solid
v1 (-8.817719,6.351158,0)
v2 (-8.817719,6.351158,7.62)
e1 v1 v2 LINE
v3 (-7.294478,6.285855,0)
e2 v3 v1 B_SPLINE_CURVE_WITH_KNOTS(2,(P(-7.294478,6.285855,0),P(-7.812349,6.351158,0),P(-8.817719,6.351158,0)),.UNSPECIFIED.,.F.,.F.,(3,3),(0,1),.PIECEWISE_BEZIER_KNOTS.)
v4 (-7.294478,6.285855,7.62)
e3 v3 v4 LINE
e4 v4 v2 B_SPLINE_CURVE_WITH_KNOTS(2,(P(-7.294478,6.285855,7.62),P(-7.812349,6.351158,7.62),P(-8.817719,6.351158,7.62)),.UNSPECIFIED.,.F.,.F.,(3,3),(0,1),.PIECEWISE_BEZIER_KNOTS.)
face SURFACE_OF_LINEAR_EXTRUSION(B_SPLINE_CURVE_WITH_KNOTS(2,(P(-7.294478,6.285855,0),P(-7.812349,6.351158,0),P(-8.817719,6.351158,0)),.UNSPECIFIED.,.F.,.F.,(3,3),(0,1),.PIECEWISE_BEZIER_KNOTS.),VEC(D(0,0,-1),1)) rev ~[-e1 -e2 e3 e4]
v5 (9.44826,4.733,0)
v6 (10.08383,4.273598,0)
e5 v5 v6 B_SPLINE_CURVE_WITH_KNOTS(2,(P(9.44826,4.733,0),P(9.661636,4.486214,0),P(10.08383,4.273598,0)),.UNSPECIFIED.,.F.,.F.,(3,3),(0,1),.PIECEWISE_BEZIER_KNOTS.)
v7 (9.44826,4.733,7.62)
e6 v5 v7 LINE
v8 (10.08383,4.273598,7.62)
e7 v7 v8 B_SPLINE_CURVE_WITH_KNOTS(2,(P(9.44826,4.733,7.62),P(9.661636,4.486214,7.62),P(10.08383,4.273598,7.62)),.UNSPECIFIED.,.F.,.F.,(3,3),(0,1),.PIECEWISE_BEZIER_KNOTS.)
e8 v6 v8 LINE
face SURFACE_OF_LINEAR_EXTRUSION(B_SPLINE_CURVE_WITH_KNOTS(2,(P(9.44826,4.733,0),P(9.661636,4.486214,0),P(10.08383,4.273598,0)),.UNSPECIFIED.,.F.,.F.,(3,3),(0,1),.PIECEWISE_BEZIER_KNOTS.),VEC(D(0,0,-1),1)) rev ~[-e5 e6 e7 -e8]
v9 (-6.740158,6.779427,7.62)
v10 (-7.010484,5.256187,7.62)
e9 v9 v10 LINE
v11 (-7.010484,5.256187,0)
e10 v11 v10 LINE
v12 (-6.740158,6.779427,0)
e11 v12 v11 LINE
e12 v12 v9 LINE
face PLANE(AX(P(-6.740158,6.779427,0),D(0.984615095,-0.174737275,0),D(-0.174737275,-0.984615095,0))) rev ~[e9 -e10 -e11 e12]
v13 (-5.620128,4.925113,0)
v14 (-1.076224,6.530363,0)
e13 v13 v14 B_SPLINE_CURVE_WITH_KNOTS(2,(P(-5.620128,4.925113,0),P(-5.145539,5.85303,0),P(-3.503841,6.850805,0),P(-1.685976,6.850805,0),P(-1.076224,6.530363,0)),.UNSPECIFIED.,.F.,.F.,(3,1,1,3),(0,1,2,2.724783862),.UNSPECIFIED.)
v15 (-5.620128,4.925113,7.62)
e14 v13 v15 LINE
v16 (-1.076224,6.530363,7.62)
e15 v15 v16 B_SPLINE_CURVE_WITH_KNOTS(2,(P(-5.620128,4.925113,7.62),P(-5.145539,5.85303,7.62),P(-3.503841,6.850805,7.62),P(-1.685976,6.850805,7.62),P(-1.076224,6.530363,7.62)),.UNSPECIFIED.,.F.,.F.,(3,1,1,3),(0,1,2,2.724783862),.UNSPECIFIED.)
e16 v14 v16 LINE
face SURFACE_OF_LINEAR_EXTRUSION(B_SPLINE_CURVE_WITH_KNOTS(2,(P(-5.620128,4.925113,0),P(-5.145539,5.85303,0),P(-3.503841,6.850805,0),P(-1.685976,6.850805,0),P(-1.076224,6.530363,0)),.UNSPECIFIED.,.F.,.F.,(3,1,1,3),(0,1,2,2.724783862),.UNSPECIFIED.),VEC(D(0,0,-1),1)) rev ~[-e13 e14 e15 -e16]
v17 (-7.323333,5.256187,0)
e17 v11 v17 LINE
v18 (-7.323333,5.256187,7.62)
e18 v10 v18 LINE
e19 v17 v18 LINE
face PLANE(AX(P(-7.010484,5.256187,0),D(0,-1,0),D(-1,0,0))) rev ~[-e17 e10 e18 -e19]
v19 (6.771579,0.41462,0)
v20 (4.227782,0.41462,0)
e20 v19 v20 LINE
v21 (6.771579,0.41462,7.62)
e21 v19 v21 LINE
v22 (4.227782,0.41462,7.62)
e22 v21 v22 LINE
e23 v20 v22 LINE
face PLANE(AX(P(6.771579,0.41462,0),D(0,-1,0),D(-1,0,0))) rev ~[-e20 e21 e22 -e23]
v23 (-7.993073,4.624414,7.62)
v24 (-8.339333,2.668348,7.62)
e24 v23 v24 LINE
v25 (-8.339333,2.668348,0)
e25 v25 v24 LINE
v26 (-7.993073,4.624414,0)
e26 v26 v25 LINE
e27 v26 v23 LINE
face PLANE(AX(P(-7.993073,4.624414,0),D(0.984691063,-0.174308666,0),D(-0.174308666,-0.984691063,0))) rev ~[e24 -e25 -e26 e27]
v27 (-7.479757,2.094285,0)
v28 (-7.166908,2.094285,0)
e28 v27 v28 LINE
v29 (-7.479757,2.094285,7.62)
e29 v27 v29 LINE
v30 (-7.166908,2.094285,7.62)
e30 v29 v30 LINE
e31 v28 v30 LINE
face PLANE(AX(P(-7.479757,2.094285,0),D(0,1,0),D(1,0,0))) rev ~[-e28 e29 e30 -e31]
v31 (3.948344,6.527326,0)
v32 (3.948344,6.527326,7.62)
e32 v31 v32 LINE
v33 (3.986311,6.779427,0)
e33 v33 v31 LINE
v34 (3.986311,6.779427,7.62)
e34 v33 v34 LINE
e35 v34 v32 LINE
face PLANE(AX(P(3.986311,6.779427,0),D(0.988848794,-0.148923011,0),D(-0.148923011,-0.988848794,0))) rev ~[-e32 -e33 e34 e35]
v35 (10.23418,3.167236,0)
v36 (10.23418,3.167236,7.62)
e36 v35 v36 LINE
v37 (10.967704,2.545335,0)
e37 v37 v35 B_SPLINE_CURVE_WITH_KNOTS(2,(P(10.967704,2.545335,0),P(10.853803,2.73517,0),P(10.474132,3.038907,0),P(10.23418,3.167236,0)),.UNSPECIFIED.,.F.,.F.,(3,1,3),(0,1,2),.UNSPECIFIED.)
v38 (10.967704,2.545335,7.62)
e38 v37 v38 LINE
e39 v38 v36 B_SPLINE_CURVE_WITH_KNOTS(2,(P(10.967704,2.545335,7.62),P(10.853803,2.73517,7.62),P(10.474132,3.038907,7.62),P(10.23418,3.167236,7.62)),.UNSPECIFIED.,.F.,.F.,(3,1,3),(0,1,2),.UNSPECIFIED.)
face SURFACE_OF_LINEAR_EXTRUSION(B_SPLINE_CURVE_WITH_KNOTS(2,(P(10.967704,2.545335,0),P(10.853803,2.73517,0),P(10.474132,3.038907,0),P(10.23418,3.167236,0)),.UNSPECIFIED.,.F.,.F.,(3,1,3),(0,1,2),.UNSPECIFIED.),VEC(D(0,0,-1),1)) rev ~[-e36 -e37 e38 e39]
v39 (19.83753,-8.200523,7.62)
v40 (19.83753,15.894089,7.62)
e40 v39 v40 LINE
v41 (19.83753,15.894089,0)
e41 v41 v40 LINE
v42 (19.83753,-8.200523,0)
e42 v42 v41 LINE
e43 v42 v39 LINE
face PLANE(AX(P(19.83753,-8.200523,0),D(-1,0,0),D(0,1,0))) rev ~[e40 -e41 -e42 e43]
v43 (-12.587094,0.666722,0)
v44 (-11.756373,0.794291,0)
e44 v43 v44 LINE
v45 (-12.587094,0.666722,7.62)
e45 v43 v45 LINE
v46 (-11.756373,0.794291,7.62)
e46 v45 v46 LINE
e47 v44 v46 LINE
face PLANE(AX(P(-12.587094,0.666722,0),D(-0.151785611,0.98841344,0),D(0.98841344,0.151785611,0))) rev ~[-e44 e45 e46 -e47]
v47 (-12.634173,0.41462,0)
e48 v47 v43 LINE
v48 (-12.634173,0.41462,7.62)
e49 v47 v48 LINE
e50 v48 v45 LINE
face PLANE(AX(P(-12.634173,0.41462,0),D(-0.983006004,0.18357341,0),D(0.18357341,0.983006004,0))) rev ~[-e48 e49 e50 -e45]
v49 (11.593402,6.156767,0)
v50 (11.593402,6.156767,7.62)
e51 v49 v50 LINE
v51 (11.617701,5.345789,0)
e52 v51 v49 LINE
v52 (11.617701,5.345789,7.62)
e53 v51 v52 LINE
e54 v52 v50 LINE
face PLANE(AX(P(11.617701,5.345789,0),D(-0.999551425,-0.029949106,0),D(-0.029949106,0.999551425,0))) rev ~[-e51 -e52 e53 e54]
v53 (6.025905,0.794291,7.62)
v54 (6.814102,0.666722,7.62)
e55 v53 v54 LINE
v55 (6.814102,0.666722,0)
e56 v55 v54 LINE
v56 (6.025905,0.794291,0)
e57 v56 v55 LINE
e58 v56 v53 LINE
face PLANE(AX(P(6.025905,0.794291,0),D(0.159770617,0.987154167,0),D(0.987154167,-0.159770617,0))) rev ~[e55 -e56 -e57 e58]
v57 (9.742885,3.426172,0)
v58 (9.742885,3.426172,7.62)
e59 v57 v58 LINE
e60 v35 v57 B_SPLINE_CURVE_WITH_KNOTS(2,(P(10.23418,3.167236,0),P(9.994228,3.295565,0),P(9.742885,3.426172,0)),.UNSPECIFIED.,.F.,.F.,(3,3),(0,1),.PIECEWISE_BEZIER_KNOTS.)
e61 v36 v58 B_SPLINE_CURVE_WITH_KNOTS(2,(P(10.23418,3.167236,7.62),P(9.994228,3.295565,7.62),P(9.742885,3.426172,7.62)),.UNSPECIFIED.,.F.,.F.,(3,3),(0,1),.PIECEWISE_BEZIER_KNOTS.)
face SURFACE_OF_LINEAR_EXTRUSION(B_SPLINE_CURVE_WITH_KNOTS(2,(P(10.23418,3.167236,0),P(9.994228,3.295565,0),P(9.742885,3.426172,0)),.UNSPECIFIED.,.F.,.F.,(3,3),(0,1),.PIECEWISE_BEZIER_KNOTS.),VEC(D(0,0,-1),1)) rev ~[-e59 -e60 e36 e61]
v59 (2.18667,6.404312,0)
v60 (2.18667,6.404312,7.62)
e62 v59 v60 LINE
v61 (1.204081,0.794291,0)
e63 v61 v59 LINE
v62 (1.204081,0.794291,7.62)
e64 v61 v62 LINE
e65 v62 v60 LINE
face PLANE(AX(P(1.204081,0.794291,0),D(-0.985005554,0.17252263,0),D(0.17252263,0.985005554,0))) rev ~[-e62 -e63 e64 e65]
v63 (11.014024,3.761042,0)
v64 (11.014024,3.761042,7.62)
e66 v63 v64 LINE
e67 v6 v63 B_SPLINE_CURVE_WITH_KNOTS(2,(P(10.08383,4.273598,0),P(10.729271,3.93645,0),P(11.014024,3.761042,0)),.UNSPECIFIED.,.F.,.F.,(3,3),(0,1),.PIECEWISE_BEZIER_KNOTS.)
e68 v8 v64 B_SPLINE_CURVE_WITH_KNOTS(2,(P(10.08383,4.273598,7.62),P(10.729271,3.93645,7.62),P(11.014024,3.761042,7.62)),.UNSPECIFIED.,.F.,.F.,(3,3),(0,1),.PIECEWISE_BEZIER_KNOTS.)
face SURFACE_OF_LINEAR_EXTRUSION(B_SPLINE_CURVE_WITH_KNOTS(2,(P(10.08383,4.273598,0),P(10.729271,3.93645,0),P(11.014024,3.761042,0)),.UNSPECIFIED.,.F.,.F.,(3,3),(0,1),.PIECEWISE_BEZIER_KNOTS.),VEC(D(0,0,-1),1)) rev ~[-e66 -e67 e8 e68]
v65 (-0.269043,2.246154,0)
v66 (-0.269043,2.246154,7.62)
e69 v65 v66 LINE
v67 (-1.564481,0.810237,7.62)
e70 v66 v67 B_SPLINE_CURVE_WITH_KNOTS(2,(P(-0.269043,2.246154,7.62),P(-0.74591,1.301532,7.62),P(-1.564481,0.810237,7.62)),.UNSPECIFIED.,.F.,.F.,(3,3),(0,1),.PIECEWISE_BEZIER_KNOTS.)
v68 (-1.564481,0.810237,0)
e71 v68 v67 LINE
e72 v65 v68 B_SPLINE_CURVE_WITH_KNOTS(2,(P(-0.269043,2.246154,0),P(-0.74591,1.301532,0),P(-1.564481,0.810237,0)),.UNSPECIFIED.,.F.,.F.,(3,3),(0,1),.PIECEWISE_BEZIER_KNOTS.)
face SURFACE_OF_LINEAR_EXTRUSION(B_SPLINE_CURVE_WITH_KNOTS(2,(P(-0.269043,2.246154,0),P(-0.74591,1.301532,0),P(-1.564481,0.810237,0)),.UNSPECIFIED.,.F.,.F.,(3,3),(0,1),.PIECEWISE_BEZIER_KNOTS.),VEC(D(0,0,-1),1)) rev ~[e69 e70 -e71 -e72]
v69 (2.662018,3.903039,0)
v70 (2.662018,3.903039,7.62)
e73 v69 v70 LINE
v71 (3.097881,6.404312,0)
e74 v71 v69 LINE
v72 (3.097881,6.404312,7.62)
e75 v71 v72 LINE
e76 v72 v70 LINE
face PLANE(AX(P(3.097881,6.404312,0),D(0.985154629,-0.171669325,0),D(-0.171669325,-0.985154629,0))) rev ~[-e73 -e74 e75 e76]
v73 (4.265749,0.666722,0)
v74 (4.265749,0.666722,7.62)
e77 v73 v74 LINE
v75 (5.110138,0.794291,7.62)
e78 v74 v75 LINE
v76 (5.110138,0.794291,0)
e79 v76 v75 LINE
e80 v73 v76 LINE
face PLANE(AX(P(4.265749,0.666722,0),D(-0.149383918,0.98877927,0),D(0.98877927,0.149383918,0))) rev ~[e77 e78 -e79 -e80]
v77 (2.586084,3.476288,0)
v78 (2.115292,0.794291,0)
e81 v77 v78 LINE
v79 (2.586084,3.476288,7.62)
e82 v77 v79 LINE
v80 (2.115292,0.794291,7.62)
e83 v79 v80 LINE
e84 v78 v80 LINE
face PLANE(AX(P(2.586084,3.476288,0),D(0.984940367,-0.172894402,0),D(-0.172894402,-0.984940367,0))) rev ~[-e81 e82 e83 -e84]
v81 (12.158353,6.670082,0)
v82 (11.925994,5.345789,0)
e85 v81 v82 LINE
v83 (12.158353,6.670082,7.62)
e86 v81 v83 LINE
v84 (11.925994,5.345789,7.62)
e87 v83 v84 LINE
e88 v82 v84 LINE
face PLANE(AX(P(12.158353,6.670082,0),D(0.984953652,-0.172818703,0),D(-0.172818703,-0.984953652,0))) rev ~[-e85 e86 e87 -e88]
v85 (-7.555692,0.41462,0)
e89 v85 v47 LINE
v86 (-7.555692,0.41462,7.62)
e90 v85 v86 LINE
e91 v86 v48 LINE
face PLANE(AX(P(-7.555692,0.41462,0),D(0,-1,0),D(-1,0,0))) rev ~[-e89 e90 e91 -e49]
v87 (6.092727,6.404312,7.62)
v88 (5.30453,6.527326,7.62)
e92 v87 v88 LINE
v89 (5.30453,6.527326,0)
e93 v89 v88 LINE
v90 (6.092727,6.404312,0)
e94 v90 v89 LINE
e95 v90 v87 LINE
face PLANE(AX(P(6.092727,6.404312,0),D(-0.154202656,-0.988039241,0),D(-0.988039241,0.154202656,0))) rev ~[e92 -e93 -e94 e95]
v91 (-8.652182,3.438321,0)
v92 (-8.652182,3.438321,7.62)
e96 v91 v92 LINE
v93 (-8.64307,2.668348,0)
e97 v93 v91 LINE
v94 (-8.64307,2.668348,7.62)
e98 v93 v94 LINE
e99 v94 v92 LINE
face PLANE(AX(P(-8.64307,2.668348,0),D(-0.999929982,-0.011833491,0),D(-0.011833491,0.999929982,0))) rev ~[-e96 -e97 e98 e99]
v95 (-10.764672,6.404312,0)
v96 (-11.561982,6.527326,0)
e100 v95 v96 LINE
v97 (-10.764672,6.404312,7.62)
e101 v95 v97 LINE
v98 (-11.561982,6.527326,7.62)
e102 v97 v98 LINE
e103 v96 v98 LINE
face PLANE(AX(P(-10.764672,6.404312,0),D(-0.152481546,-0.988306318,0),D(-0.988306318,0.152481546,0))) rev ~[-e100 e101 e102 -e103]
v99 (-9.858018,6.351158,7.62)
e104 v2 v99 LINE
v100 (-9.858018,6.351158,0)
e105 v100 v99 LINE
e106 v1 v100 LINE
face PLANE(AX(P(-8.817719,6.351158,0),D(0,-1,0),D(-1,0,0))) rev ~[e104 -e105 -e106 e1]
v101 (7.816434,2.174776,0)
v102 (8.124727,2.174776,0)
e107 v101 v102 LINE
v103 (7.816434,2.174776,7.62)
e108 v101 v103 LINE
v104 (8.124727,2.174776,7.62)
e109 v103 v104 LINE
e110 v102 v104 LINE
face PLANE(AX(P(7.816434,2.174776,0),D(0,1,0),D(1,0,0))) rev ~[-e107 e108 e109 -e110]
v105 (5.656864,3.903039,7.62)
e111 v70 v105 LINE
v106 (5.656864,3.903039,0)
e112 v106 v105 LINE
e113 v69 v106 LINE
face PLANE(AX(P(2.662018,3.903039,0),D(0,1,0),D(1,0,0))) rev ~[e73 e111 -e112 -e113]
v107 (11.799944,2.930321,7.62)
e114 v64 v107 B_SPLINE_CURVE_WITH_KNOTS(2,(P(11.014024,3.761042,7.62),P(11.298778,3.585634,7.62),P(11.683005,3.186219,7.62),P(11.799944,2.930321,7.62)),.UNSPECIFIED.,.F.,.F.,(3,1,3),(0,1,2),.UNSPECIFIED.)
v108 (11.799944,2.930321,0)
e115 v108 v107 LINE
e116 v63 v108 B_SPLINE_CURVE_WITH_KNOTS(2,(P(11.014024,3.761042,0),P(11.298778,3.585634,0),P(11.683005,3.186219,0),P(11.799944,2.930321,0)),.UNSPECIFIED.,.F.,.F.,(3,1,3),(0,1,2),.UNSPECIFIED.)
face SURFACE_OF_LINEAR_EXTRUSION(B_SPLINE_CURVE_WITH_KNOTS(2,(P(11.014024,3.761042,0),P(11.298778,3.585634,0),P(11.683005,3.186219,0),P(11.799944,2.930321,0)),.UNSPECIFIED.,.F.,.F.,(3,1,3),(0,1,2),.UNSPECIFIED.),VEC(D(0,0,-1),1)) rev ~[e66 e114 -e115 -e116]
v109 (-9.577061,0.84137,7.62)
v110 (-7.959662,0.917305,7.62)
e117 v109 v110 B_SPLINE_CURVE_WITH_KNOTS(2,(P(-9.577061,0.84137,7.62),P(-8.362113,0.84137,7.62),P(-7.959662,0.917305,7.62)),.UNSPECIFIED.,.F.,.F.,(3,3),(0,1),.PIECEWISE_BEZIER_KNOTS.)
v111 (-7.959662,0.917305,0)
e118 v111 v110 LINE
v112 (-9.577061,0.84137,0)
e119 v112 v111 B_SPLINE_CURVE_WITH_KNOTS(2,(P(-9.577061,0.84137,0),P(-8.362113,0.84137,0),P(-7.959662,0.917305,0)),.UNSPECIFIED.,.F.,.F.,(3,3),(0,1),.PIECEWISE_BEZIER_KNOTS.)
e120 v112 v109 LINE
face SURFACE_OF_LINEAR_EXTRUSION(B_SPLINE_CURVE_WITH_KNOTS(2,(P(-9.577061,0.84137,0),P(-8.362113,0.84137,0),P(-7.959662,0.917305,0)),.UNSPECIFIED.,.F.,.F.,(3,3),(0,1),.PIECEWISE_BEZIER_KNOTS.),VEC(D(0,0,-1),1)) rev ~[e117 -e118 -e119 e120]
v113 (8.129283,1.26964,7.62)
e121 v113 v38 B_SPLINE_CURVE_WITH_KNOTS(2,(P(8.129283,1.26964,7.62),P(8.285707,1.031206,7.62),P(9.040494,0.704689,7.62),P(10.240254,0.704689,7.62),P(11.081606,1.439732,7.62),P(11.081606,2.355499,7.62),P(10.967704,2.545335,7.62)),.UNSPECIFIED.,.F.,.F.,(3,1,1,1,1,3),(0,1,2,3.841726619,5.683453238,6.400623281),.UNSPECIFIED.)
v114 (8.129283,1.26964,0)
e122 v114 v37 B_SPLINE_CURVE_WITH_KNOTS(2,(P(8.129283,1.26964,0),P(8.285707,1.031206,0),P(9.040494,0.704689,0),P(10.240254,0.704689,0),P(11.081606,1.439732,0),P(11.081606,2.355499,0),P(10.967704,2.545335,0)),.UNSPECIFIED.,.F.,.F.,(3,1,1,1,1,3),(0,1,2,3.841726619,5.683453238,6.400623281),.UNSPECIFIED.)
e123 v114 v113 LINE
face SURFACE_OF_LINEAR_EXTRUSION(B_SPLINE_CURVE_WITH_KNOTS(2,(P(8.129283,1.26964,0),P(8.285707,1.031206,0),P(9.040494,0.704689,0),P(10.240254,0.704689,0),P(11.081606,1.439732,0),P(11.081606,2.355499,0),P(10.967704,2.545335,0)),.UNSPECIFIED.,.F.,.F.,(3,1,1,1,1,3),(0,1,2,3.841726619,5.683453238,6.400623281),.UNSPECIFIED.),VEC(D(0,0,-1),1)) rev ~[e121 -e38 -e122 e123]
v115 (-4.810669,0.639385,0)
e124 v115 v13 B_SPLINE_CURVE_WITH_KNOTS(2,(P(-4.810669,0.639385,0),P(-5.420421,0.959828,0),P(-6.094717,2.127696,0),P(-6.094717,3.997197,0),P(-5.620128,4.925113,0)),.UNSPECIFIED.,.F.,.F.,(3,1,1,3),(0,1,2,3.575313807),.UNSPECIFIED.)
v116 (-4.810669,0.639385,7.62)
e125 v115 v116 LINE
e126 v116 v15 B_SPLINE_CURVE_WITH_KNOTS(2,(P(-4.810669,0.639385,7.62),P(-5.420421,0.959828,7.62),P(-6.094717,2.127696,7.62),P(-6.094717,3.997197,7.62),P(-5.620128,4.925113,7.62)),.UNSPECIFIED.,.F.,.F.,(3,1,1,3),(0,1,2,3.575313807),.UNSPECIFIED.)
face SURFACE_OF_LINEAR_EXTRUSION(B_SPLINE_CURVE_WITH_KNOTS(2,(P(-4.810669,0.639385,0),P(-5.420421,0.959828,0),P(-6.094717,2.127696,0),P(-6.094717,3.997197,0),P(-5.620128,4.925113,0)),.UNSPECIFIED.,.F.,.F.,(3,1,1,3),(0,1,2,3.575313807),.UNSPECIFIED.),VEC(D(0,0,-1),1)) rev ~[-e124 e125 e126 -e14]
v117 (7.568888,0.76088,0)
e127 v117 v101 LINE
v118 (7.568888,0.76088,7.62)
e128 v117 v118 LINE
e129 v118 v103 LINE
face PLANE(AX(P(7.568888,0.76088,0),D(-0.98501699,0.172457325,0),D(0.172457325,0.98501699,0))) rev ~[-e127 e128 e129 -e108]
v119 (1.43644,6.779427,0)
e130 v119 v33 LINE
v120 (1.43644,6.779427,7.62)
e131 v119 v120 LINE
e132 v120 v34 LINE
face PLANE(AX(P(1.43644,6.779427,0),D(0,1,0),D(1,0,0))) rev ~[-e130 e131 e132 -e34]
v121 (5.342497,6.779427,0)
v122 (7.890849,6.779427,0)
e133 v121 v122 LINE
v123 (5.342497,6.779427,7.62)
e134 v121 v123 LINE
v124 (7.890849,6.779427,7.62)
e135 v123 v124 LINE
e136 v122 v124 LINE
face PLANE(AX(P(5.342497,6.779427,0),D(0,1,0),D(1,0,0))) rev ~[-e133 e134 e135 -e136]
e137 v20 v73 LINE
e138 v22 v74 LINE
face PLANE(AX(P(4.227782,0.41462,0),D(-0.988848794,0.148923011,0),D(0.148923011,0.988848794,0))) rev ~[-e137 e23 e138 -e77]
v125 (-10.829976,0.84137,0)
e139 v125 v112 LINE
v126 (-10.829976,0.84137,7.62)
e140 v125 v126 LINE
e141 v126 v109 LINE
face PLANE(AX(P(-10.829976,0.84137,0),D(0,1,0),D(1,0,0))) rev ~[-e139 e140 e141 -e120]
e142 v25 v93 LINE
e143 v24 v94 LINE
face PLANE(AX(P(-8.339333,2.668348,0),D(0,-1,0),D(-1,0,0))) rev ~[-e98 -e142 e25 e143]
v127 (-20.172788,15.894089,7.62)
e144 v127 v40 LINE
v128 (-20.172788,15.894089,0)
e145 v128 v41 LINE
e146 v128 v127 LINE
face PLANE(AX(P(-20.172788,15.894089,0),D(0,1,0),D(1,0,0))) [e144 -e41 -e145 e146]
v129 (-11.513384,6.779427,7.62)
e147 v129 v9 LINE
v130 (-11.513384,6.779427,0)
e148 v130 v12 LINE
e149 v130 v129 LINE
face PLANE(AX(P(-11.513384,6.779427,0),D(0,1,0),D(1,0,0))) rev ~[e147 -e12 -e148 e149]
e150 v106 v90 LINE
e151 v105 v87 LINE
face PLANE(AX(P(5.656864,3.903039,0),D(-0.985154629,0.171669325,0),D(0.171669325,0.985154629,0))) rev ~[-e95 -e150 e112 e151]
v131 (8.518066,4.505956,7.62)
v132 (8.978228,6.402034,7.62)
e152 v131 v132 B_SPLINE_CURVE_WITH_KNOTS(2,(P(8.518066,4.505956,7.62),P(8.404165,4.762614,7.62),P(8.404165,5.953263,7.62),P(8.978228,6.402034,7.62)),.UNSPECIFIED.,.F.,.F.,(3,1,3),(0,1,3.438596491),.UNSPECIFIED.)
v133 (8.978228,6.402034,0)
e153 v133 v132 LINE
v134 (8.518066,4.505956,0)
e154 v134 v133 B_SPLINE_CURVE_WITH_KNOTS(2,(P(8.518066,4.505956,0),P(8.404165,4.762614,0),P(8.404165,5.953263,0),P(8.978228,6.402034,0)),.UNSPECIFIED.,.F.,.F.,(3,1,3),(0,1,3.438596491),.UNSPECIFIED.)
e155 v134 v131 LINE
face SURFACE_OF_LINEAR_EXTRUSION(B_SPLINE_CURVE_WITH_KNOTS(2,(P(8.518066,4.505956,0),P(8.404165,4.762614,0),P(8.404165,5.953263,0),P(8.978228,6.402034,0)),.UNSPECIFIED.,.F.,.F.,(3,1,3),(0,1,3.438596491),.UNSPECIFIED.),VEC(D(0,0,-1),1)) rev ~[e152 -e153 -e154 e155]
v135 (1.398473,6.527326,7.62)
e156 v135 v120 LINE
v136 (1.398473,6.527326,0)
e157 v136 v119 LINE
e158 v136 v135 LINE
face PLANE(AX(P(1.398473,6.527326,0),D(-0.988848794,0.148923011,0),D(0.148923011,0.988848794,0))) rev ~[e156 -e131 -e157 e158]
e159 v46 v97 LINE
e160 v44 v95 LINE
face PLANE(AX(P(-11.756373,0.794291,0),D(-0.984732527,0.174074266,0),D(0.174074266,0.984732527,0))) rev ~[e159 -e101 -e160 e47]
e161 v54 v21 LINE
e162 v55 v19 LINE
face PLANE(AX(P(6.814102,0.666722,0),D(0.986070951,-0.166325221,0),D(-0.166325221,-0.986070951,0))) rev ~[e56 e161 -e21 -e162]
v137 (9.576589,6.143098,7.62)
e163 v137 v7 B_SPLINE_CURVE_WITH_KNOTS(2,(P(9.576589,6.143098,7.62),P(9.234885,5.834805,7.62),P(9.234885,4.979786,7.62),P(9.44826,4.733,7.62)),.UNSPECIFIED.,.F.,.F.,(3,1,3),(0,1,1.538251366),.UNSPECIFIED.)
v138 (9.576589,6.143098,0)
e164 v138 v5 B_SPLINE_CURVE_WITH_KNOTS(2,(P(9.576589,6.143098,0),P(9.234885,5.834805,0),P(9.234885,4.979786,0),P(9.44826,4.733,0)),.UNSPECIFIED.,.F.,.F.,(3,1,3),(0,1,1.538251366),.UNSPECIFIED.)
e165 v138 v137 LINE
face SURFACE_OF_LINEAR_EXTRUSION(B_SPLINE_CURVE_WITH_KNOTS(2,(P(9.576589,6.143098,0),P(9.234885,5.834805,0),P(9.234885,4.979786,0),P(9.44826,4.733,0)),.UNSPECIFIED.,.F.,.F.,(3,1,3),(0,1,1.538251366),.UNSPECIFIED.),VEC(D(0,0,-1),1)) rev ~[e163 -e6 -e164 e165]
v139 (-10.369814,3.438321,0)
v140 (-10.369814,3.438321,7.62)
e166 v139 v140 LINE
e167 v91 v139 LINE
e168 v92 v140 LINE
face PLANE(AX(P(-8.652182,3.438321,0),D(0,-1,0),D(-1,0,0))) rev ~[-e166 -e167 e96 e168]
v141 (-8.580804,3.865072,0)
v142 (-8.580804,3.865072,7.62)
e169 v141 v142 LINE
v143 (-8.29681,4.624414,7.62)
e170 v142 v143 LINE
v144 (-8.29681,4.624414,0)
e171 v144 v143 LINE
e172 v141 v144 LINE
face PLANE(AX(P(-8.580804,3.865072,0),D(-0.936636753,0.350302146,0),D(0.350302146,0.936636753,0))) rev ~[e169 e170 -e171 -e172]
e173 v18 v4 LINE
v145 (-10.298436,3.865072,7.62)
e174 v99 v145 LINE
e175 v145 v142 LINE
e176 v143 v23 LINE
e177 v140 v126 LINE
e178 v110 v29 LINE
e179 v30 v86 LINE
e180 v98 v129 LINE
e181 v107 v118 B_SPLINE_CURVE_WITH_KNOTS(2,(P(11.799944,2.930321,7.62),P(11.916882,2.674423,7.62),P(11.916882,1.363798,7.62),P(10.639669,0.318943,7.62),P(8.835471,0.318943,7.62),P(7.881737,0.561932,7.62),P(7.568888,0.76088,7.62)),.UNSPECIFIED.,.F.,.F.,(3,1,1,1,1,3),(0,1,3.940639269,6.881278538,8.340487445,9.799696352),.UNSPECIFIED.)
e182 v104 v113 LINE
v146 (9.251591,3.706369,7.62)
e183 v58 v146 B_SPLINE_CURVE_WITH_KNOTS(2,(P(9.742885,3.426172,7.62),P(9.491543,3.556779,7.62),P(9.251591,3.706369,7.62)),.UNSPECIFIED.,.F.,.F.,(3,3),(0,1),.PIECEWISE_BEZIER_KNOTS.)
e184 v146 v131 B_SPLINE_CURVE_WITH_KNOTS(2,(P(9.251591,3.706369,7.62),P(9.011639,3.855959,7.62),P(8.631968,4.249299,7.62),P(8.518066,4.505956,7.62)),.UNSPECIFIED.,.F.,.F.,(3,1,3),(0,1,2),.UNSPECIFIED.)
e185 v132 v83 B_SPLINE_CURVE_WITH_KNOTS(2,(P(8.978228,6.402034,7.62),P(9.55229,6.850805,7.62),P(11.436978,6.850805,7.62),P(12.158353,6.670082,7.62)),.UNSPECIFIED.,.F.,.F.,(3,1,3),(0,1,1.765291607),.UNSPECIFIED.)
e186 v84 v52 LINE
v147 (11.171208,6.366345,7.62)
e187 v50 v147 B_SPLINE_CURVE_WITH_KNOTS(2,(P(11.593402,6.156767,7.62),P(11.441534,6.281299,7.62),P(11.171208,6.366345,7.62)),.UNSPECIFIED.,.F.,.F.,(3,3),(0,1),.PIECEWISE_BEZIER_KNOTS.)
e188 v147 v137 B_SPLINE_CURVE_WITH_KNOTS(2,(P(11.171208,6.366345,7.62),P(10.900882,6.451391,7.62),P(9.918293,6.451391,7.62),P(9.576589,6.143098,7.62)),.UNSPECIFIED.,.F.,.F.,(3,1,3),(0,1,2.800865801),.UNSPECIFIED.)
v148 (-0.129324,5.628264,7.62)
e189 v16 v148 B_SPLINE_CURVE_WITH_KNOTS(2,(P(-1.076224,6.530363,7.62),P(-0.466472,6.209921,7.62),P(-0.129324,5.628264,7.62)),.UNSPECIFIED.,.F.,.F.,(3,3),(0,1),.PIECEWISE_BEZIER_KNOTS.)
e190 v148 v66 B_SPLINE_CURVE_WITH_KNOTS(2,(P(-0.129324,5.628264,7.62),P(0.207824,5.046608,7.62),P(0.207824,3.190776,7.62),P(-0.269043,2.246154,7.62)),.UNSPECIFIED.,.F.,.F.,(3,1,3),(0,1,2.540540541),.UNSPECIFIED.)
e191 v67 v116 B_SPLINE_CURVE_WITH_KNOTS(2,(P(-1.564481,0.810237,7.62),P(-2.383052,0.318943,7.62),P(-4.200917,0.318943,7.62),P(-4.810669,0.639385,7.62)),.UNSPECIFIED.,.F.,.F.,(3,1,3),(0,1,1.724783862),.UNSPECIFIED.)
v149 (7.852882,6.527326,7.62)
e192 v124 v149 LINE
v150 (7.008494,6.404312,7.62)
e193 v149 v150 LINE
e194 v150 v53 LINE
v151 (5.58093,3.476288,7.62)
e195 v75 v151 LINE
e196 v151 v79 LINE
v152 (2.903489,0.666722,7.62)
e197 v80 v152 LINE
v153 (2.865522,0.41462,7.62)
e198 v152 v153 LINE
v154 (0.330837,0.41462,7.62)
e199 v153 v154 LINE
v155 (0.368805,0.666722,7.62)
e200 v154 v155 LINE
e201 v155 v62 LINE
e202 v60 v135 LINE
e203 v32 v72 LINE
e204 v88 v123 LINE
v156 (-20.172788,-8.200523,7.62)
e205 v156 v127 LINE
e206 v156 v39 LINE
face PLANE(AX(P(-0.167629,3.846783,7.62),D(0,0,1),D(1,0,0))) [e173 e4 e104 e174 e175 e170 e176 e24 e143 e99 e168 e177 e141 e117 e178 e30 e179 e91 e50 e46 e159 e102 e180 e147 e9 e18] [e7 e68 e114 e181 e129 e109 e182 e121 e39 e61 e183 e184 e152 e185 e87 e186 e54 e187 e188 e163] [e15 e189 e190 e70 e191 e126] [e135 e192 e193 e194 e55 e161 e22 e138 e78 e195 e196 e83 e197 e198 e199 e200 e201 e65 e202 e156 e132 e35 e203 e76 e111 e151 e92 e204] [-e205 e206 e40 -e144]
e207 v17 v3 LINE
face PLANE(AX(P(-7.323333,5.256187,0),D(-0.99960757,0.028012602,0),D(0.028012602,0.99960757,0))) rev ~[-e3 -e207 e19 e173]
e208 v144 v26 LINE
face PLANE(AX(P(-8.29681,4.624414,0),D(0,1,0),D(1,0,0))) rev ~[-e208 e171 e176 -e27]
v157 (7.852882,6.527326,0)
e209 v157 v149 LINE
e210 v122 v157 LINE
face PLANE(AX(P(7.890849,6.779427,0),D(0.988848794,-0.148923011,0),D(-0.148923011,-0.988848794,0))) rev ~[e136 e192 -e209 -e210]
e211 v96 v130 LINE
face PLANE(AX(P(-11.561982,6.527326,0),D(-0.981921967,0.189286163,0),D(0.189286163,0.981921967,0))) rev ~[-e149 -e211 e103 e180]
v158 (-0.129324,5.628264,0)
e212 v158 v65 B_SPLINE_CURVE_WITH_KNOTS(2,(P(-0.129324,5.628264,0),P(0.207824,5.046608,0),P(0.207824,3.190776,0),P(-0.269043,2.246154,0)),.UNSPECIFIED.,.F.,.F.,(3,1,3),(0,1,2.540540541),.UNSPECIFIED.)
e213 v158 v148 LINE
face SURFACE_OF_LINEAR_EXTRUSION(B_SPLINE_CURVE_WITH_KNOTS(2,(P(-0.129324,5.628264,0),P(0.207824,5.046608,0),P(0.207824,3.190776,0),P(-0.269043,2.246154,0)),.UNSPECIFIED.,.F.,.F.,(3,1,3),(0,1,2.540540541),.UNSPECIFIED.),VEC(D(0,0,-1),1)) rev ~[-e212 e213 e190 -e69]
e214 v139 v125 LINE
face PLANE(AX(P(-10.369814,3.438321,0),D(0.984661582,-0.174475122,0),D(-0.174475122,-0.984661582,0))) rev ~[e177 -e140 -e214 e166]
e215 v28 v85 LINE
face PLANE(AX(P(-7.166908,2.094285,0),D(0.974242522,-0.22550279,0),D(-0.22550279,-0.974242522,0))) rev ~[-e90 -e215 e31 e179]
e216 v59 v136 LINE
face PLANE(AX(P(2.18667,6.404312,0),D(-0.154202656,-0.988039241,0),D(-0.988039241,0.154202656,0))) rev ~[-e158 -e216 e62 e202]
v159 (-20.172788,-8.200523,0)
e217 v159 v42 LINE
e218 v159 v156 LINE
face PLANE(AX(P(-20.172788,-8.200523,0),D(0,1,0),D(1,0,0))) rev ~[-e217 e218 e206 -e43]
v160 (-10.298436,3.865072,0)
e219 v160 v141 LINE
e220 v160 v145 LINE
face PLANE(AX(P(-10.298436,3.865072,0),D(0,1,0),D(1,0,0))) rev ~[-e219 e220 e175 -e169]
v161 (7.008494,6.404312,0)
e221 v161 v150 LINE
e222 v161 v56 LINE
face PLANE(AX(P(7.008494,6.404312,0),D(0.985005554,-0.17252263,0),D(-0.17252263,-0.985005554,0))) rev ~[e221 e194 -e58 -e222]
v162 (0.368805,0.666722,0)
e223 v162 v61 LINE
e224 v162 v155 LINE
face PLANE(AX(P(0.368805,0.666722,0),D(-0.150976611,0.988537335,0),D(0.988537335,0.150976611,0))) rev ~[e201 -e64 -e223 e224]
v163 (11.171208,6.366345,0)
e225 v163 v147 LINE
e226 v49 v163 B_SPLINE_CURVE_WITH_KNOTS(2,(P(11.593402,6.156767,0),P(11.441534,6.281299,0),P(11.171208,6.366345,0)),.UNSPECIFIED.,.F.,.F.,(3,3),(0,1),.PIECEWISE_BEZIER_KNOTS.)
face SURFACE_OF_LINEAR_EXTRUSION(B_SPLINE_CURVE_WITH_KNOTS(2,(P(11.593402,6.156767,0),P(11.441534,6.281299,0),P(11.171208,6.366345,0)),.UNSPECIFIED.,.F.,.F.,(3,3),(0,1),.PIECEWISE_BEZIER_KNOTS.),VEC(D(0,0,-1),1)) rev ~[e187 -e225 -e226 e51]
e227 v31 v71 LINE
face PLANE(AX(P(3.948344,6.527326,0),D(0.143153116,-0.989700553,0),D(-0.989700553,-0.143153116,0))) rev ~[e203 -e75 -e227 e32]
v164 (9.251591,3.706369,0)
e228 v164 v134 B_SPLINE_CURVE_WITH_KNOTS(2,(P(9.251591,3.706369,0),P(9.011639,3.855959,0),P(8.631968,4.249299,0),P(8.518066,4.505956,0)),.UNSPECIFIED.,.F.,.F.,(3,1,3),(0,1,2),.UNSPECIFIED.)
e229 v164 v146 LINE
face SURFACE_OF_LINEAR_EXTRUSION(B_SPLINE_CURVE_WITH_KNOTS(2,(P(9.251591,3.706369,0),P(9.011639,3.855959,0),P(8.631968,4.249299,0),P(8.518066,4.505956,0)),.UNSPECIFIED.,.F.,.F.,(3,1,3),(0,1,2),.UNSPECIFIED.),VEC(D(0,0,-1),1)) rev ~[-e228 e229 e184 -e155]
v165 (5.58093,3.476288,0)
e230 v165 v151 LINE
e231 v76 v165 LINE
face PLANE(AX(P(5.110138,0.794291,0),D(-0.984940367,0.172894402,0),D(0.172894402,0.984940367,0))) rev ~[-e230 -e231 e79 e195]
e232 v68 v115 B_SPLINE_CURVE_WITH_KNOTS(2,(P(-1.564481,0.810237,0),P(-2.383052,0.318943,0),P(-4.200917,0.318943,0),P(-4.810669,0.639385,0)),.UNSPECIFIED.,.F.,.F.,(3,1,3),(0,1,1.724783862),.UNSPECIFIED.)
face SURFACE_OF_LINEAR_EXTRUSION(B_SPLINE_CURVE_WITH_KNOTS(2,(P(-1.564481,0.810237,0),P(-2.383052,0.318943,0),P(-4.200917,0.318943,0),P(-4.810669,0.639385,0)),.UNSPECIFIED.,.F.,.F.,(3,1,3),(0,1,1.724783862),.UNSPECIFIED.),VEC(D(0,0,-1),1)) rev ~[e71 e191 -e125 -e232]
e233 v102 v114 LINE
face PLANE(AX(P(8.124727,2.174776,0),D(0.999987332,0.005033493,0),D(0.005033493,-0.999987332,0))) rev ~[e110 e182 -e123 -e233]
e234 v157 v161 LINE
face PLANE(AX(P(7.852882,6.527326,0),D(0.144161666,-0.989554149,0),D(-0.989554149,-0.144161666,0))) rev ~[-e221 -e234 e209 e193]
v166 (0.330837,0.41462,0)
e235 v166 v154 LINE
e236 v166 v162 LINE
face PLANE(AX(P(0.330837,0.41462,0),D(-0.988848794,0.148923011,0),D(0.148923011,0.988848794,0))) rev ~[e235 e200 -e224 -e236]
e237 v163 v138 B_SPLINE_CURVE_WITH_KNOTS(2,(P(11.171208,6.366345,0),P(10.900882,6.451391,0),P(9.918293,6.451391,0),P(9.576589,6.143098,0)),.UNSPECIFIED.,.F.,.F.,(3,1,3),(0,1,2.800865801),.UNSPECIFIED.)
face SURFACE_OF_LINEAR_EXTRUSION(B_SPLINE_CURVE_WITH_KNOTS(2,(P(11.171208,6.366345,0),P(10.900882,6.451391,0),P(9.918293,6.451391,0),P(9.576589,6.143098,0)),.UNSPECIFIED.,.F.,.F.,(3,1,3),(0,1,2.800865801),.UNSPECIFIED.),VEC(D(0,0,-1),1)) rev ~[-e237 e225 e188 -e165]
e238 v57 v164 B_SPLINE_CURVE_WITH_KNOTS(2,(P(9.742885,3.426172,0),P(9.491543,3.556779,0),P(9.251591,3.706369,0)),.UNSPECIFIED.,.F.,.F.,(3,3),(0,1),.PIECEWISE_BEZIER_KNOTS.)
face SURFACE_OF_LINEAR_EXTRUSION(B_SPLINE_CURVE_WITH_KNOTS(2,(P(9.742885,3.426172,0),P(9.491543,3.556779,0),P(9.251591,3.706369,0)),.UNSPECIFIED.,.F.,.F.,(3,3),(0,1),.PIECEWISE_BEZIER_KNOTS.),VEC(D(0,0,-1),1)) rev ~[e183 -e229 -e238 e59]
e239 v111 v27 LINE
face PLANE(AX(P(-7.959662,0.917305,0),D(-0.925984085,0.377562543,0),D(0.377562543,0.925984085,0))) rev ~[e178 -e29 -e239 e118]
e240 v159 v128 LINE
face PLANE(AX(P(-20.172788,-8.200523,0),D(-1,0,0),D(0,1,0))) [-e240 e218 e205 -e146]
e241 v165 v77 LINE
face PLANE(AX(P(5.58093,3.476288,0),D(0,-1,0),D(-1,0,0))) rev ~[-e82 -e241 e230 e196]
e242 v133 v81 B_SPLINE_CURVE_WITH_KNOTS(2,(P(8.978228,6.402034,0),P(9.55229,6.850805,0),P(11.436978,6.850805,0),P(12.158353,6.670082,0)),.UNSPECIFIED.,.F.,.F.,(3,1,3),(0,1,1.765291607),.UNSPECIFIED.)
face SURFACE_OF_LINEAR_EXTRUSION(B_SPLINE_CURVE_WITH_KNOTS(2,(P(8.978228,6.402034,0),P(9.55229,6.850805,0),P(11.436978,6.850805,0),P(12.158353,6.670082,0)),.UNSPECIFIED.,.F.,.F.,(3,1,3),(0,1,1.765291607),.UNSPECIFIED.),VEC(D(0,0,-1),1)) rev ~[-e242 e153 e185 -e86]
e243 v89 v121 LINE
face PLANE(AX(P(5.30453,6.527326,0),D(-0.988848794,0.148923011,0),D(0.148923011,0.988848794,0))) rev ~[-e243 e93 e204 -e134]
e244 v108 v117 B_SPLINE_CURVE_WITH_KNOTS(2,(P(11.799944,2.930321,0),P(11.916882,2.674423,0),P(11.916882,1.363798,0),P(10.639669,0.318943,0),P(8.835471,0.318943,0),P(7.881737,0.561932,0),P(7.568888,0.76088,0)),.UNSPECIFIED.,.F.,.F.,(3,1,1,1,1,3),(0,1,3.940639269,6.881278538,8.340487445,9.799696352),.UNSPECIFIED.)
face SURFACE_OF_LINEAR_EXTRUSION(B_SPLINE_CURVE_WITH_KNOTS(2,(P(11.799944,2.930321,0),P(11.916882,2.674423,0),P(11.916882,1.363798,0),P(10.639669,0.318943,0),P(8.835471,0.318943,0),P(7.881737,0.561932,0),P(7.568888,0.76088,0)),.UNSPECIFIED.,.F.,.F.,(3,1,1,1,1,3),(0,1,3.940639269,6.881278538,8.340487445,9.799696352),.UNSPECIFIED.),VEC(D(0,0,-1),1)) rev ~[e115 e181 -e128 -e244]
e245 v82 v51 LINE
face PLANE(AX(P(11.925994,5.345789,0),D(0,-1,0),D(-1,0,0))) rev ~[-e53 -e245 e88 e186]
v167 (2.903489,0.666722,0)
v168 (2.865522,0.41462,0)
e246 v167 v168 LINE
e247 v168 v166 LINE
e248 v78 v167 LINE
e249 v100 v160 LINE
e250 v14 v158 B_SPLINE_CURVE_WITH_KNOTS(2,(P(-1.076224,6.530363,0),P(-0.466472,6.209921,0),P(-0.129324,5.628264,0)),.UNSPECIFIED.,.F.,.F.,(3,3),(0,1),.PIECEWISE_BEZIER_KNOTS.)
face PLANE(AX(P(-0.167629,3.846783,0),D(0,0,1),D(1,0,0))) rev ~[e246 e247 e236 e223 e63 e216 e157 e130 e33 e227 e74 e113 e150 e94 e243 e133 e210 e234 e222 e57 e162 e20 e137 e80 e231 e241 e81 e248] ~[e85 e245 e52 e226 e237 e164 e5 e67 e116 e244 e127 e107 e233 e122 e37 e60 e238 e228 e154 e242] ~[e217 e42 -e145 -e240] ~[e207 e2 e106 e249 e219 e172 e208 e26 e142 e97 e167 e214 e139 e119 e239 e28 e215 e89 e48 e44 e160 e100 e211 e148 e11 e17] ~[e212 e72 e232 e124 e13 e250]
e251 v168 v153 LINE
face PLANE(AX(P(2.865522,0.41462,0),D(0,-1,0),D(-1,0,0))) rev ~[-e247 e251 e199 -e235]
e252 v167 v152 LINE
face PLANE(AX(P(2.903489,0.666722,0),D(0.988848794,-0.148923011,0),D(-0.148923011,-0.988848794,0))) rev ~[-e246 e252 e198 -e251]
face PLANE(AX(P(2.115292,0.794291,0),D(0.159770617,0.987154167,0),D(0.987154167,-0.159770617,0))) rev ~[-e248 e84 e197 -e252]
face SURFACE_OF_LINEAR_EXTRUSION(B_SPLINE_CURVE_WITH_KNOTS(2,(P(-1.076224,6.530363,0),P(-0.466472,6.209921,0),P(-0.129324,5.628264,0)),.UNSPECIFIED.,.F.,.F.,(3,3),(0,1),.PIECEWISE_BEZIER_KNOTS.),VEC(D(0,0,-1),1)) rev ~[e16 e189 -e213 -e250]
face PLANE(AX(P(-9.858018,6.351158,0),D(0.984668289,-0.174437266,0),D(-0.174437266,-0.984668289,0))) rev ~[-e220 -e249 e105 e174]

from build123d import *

# Parameters (mm, degrees)
F0_W     = 40.0103181601
F0_H     = 24.0946123376
F1_DEPTH = 7.62


with BuildPart() as f1:
    # F0 (on Top) → F1 (new body)
    with BuildSketch(Plane.XY):
        with Locations((-0.1676287502, 3.8467827253)):
            Rectangle(F0_W, F0_H)
        with BuildLine():
            Line((-11.7563733071, 0.7942912366), (-10.7646722607, 6.4043121633))
            Line((-10.7646722607, 6.4043121633), (-11.5619816778, 6.5273256163))
            Line((-11.5619816778, 6.5273256163), (-11.5133837704, 6.7794272605))
            Line((-11.5133837704, 6.7794272605), (-6.7401580604, 6.7794272605))
            Line((-6.7401580604, 6.7794272605), (-7.0104839199, 5.2561866028))
            Line((-7.0104839199, 5.2561866028), (-7.3233329483, 5.2561866028))
            Line((-7.3233329483, 5.2561866028), (-7.2944779408, 6.2858547642))
            add(Edge.make_bspline(
                [(-7.2944779408, 6.2858547642), (-7.8123493908, 6.3511582022), (-8.8177185985, 6.3511582022)],
                knots=[0, 0, 0, 1, 1, 1], degree=2))
            Line((-8.8177185985, 6.3511582022), (-9.8580175522, 6.3511582022))
            Line((-9.8580175522, 6.3511582022), (-10.2984360873, 3.8650715056))
            Line((-10.2984360873, 3.8650715056), (-8.5808038003, 3.8650715056))
            Line((-8.5808038003, 3.8650715056), (-8.2968097794, 4.6244138076))
            Line((-8.2968097794, 4.6244138076), (-7.9930728586, 4.6244138076))
            Line((-7.9930728586, 4.6244138076), (-8.3393329483, 2.6683480378))
            Line((-8.3393329483, 2.6683480378), (-8.6430698691, 2.6683480378))
            Line((-8.6430698691, 2.6683480378), (-8.6521819767, 3.4383211319))
            Line((-8.6521819767, 3.4383211319), (-10.3698142637, 3.4383211319))
            Line((-10.3698142637, 3.4383211319), (-10.8299756987, 0.8413704593))
            Line((-10.8299756987, 0.8413704593), (-9.5770609005, 0.8413704593))
            add(Edge.make_bspline(
                [(-9.5770609005, 0.8413704593), (-8.3621132174, 0.8413704593), (-7.9596617973, 0.9173046895)],
                knots=[0, 0, 0, 1, 1, 1], degree=2))
            Line((-7.9596617973, 0.9173046895), (-7.4797574625, 2.0942852575))
            Line((-7.4797574625, 2.0942852575), (-7.1669084341, 2.0942852575))
            Line((-7.1669084341, 2.0942852575), (-7.5556916927, 0.4146200856))
            Line((-7.5556916927, 0.4146200856), (-12.6341730081, 0.4146200856))
            Line((-12.6341730081, 0.4146200856), (-12.5870937854, 0.6667217299))
            Line((-12.5870937854, 0.6667217299), (-11.7563733071, 0.7942912366))
        make_face(mode=Mode.SUBTRACT)
        with BuildLine():
            add(Edge.make_bspline(
                [(-1.5644809304, 0.8102374249), (-2.3830519319, 0.3189429556), (-3.437019047, 0.3189429556)],
                knots=[0, 0, 0, 1, 1, 1], degree=2))
            add(Edge.make_bspline(
                [(-3.437019047, 0.3189429556), (-4.2009174027, 0.3189429556), (-4.8106692712, 0.639385407)],
                knots=[0, 0, 0, 1, 1, 1], degree=2))
            add(Edge.make_bspline(
                [(-4.8106692712, 0.639385407), (-5.4204211396, 0.9598278584), (-5.7575691217, 1.5437620886)],
                knots=[0, 0, 0, 1, 1, 1], degree=2))
            add(Edge.make_bspline(
                [(-5.7575691217, 1.5437620886), (-6.0947171038, 2.1276963188), (-6.0947171038, 2.8536275595)],
                knots=[0, 0, 0, 1, 1, 1], degree=2))
            add(Edge.make_bspline(
                [(-6.0947171038, 2.8536275595), (-6.0947171038, 3.9971970662), (-5.6201281651, 4.9251133592)],
                knots=[0, 0, 0, 1, 1, 1], degree=2))
            add(Edge.make_bspline(
                [(-5.6201281651, 4.9251133592), (-5.1455392263, 5.8530296521), (-4.3246901979, 6.3519175445)],
                knots=[0, 0, 0, 1, 1, 1], degree=2))
            add(Edge.make_bspline(
                [(-4.3246901979, 6.3519175445), (-3.5038411695, 6.8508054369), (-2.4498740544, 6.8508054369)],
                knots=[0, 0, 0, 1, 1, 1], degree=2))
            add(Edge.make_bspline(
                [(-2.4498740544, 6.8508054369), (-1.6859756987, 6.8508054369), (-1.0762238302, 6.5303629855)],
                knots=[0, 0, 0, 1, 1, 1], degree=2))
            add(Edge.make_bspline(
                [(-1.0762238302, 6.5303629855), (-0.4664719618, 6.209920534), (-0.1293239797, 5.6282643308)],
                knots=[0, 0, 0, 1, 1, 1], degree=2))
            add(Edge.make_bspline(
                [(-0.1293239797, 5.6282643308), (0.2078240024, 5.0466081275), (0.2078240024, 4.316120833)],
                knots=[0, 0, 0, 1, 1, 1], degree=2))
            add(Edge.make_bspline(
                [(0.2078240024, 4.316120833), (0.2078240024, 3.1907755415), (-0.2690429633, 2.2461537179)],
                knots=[0, 0, 0, 1, 1, 1], degree=2))
            add(Edge.make_bspline(
                [(-0.2690429633, 2.2461537179), (-0.7459099289, 1.3015318943), (-1.5644809304, 0.8102374249)],
                knots=[0, 0, 0, 1, 1, 1], degree=2))
        make_face(mode=Mode.SUBTRACT)
        Polygon((2.8655220592, 0.4146200856), (0.3308374553, 0.4146200856), (0.3688045704, 0.6667217299), (1.2040811025, 0.7942912366), (2.1866700412, 6.4043121633), (1.3984727318, 6.5273256163), (1.4364398469, 6.7794272605), (3.9863112968, 6.7794272605), (3.9483441817, 6.5273256163), (3.0978808036, 6.4043121633), (2.6620183222, 3.9030386207), (5.6568643611, 3.9030386207), (6.0927268424, 6.4043121633), (5.304529533, 6.5273256163), (5.3424966481, 6.7794272605), (7.8908494134, 6.7794272605), (7.8528822983, 6.5273256163), (7.0084936586, 6.4043121633), (6.0259047199, 0.7942912366), (6.8141020293, 0.6667217299), (6.7715788604, 0.4146200856), (4.2277821488, 0.4146200856), (4.2657492639, 0.6667217299), (5.1101379037, 0.7942912366), (5.5809301309, 3.476288247), (2.586084092, 3.476288247), (2.1152918648, 0.7942912366), (2.9034891743, 0.6667217299), align=None, mode=Mode.SUBTRACT)
        with BuildLine():
            Line((7.5688882774, 0.7608801753), (7.8164338678, 2.1747755415))
            Line((7.8164338678, 2.1747755415), (8.1247268424, 2.1747755415))
            Line((8.1247268424, 2.1747755415), (8.1292828962, 1.2696395176))
            add(Edge.make_bspline(
                [(8.1292828962, 1.2696395176), (8.2857074104, 1.0312060348), (8.6631005345, 0.8679474399)],
                knots=[0, 0, 0, 1, 1, 1], degree=2))
            add(Edge.make_bspline(
                [(8.6631005345, 0.8679474399), (9.0404936586, 0.704688845), (9.4626879784, 0.704688845)],
                knots=[0, 0, 0, 1, 1, 1], degree=2))
            add(Edge.make_bspline(
                [(9.4626879784, 0.704688845), (10.2402544956, 0.704688845), (10.6609301309, 1.0722105191)],
                knots=[0, 0, 0, 1, 1, 1], degree=2))
            add(Edge.make_bspline(
                [(10.6609301309, 1.0722105191), (11.0816057662, 1.4397321932), (11.0816057662, 2.0988413113)],
                knots=[0, 0, 0, 1, 1, 1], degree=2))
            add(Edge.make_bspline(
                [(11.0816057662, 2.0988413113), (11.0816057662, 2.3554990094), (10.9677044209, 2.5453345849)],
                knots=[0, 0, 0, 1, 1, 1], degree=2))
            add(Edge.make_bspline(
                [(10.9677044209, 2.5453345849), (10.8538030756, 2.7351701603), (10.6639675001, 2.8870386207)],
                knots=[0, 0, 0, 1, 1, 1], degree=2))
            add(Edge.make_bspline(
                [(10.6639675001, 2.8870386207), (10.4741319246, 3.0389070811), (10.2341797572, 3.1672359302)],
                knots=[0, 0, 0, 1, 1, 1], degree=2))
            add(Edge.make_bspline(
                [(10.2341797572, 3.1672359302), (9.9942275898, 3.2955647792), (9.7428852879, 3.4261716551)],
                knots=[0, 0, 0, 1, 1, 1], degree=2))
            add(Edge.make_bspline(
                [(9.7428852879, 3.4261716551), (9.4915429859, 3.5567785311), (9.2515908185, 3.7063689645)],
                knots=[0, 0, 0, 1, 1, 1], degree=2))
            add(Edge.make_bspline(
                [(9.2515908185, 3.7063689645), (9.0116386511, 3.855959398), (8.8218030756, 4.0526290542)],
                knots=[0, 0, 0, 1, 1, 1], degree=2))
            add(Edge.make_bspline(
                [(8.8218030756, 4.0526290542), (8.6319675001, 4.2492987104), (8.5180661548, 4.5059564085)],
                knots=[0, 0, 0, 1, 1, 1], degree=2))
            add(Edge.make_bspline(
                [(8.5180661548, 4.5059564085), (8.4041648095, 4.7626141065), (8.4041648095, 5.1088741962)],
                knots=[0, 0, 0, 1, 1, 1], degree=2))
            add(Edge.make_bspline(
                [(8.4041648095, 5.1088741962), (8.4041648095, 5.953262836), (8.9782275898, 6.4020341364)],
                knots=[0, 0, 0, 1, 1, 1], degree=2))
            add(Edge.make_bspline(
                [(8.9782275898, 6.4020341364), (9.5522903701, 6.8508054369), (10.6199256466, 6.8508054369)],
                knots=[0, 0, 0, 1, 1, 1], degree=2))
            add(Edge.make_bspline(
                [(10.6199256466, 6.8508054369), (11.4369779635, 6.8508054369), (12.1583531503, 6.670081969)],
                knots=[0, 0, 0, 1, 1, 1], degree=2))
            Line((12.1583531503, 6.670081969), (11.9259944059, 5.3457889944))
            Line((11.9259944059, 5.3457889944), (11.6177014314, 5.3457889944))
            Line((11.6177014314, 5.3457889944), (11.5934024777, 6.1567665729))
            add(Edge.make_bspline(
                [(11.5934024777, 6.1567665729), (11.4415340173, 6.2812987104), (11.1712081578, 6.3663450482)],
                knots=[0, 0, 0, 1, 1, 1], degree=2))
            add(Edge.make_bspline(
                [(11.1712081578, 6.3663450482), (10.9008822983, 6.4513913861), (10.5500661548, 6.4513913861)],
                knots=[0, 0, 0, 1, 1, 1], degree=2))
            add(Edge.make_bspline(
                [(10.5500661548, 6.4513913861), (9.9182933596, 6.4513913861), (9.5765893237, 6.1430984115)],
                knots=[0, 0, 0, 1, 1, 1], degree=2))
            add(Edge.make_bspline(
                [(9.5765893237, 6.1430984115), (9.2348852879, 5.8348054369), (9.2348852879, 5.2789668719)],
                knots=[0, 0, 0, 1, 1, 1], degree=2))
            add(Edge.make_bspline(
                [(9.2348852879, 5.2789668719), (9.2348852879, 4.9797860049), (9.4482604747, 4.7329997568)],
                knots=[0, 0, 0, 1, 1, 1], degree=2))
            add(Edge.make_bspline(
                [(9.4482604747, 4.7329997568), (9.6616356616, 4.4862135086), (10.0838299814, 4.2735976641)],
                knots=[0, 0, 0, 1, 1, 1], degree=2))
            add(Edge.make_bspline(
                [(10.0838299814, 4.2735976641), (10.7292709381, 3.936449682), (11.0140243013, 3.7610416103)],
                knots=[0, 0, 0, 1, 1, 1], degree=2))
            add(Edge.make_bspline(
                [(11.0140243013, 3.7610416103), (11.2987776645, 3.5856335385), (11.4908912669, 3.3859265131)],
                knots=[0, 0, 0, 1, 1, 1], degree=2))
            add(Edge.make_bspline(
                [(11.4908912669, 3.3859265131), (11.6830048693, 3.1862194877), (11.7999435838, 2.9303211319)],
                knots=[0, 0, 0, 1, 1, 1], degree=2))
            add(Edge.make_bspline(
                [(11.7999435838, 2.9303211319), (11.9168822983, 2.6744227762), (11.9168822983, 2.3418308479)],
                knots=[0, 0, 0, 1, 1, 1], degree=2))
            add(Edge.make_bspline(
                [(11.9168822983, 2.3418308479), (11.9168822983, 1.363797963), (11.2782754224, 0.8413704593)],
                knots=[0, 0, 0, 1, 1, 1], degree=2))
            add(Edge.make_bspline(
                [(11.2782754224, 0.8413704593), (10.6396685465, 0.3189429556), (9.433832971, 0.3189429556)],
                knots=[0, 0, 0, 1, 1, 1], degree=2))
            add(Edge.make_bspline(
                [(9.433832971, 0.3189429556), (8.835471237, 0.3189429556), (8.3586042714, 0.4404377239)],
                knots=[0, 0, 0, 1, 1, 1], degree=2))
            add(Edge.make_bspline(
                [(8.3586042714, 0.4404377239), (7.8817373058, 0.5619324922), (7.5688882774, 0.7608801753)],
                knots=[0, 0, 0, 1, 1, 1], degree=2))
        make_face(mode=Mode.SUBTRACT)
    extrude(amount=F1_DEPTH)


solid = f1.part
